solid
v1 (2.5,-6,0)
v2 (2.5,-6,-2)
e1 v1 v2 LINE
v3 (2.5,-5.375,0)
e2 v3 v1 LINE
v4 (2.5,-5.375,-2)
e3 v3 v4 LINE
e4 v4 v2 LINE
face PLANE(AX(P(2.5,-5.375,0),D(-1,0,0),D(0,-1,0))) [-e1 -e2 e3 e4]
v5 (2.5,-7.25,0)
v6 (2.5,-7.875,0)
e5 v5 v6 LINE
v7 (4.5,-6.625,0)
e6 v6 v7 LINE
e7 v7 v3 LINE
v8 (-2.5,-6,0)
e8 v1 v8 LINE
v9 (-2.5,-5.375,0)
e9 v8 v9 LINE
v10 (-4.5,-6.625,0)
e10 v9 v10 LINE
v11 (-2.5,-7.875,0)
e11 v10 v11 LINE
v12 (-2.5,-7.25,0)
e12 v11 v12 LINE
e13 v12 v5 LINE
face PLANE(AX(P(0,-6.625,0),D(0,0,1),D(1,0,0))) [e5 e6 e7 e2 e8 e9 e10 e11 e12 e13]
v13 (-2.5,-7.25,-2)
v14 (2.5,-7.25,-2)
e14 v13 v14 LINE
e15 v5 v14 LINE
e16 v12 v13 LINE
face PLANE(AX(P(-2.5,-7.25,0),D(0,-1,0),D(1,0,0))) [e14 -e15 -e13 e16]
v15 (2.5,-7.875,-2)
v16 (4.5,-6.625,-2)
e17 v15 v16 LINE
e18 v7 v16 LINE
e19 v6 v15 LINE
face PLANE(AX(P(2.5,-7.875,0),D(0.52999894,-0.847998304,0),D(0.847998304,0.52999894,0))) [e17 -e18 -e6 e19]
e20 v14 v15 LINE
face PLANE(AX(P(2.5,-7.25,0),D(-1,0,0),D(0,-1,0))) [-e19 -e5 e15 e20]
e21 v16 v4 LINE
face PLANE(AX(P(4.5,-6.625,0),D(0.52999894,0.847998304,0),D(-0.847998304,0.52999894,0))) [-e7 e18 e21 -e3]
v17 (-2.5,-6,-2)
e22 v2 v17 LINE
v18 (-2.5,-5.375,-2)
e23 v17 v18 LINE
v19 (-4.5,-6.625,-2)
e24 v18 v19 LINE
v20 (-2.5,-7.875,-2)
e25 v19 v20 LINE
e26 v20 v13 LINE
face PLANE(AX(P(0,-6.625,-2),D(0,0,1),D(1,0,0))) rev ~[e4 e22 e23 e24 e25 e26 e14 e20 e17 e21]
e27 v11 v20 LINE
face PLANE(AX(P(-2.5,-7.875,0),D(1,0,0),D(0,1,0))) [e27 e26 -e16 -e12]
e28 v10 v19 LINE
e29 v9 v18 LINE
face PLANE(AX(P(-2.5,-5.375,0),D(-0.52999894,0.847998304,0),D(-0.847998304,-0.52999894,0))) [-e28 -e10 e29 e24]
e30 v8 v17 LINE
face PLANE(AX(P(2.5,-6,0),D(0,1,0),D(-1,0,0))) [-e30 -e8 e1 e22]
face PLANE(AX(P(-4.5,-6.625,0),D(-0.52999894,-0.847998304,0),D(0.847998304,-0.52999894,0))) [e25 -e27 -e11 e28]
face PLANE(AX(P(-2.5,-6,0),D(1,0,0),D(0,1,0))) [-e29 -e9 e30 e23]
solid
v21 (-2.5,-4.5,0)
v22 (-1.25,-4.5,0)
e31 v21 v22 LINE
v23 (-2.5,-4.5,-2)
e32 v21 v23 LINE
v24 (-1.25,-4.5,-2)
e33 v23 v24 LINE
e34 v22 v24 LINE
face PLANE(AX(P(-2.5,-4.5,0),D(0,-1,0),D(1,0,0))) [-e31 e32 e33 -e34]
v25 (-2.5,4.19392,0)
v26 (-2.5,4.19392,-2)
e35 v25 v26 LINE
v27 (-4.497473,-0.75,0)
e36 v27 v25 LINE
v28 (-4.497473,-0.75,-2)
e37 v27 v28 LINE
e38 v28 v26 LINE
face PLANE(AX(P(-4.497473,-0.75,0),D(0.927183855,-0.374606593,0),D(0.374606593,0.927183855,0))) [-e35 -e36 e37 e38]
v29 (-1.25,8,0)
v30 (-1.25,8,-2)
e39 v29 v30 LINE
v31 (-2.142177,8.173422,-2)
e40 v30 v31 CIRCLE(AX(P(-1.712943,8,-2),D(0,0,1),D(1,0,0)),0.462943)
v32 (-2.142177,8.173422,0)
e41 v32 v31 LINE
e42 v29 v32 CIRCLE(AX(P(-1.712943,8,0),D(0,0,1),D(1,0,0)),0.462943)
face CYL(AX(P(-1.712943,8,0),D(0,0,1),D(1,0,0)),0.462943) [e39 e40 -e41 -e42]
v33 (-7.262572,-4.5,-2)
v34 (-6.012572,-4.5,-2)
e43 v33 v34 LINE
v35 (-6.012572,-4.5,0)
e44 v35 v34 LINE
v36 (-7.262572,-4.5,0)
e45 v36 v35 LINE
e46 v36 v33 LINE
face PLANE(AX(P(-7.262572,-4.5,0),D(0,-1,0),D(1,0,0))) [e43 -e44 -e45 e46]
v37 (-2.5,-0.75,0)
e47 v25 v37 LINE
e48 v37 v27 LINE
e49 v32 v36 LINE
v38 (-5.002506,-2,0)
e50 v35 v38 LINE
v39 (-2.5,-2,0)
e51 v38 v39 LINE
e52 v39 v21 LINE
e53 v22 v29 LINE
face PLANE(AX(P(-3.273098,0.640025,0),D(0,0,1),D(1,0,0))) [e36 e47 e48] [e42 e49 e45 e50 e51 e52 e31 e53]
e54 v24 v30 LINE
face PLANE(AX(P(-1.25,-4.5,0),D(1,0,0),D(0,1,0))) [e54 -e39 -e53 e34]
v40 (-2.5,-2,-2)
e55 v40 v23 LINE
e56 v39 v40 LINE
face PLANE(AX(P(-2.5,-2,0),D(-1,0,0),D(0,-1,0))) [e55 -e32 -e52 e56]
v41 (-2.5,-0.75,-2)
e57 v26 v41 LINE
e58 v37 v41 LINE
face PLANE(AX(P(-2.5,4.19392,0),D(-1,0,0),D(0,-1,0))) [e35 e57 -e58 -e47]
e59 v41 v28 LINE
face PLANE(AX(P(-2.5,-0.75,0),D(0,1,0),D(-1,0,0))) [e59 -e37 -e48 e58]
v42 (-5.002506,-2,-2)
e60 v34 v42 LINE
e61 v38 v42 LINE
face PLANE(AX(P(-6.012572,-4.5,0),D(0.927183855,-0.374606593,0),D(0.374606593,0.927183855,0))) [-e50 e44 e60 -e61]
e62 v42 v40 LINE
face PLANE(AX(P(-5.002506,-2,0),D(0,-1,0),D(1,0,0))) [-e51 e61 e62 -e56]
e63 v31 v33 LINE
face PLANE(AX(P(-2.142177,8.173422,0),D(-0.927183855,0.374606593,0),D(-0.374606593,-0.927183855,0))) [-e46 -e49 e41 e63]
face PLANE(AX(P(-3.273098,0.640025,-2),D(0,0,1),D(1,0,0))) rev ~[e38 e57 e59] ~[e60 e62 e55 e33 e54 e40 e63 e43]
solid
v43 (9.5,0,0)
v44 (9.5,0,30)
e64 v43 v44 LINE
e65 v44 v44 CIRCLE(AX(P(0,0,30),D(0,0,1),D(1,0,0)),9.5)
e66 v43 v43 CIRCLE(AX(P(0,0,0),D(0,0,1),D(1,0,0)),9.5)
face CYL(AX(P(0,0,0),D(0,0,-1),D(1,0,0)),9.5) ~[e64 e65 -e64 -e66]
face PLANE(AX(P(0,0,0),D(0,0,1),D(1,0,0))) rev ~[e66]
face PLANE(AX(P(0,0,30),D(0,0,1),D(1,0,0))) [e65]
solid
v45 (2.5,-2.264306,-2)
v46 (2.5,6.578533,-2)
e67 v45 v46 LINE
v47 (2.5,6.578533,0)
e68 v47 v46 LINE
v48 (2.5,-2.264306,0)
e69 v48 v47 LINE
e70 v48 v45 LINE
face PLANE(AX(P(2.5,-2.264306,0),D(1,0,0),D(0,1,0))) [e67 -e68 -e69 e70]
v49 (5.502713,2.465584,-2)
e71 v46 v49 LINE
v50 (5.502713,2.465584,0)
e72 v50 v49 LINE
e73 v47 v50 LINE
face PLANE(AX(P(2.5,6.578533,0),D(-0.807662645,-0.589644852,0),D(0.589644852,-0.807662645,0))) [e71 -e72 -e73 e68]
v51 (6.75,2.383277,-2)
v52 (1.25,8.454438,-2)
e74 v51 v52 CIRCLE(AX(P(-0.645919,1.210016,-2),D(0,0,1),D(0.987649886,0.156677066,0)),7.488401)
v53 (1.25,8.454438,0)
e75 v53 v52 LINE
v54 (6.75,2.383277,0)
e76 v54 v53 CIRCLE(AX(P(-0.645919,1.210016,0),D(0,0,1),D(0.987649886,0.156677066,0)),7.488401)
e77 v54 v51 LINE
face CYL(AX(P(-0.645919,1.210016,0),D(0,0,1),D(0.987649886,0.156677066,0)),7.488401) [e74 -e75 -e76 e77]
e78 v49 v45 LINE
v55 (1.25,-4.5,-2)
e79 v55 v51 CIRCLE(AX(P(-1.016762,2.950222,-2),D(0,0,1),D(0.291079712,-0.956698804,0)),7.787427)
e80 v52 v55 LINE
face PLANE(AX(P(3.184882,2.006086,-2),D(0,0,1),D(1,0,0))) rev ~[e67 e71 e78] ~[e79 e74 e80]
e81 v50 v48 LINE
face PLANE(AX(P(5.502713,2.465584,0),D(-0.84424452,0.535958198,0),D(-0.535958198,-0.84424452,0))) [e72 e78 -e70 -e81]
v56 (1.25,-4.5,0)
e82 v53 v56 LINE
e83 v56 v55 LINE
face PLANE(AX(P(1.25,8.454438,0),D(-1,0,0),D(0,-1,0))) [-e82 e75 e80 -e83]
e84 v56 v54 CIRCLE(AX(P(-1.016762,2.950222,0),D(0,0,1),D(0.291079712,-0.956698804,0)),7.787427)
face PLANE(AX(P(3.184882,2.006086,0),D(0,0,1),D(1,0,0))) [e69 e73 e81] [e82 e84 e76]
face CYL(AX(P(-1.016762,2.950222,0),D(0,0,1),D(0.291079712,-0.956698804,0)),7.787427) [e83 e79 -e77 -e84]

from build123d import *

# Parameters (mm, degrees)
F1_DEPTH = 2
F0_R     = 9.5
F2_DEPTH = 30


with BuildPart() as f1:
    # F0 (on Top) → F1 (new body)
    with BuildSketch(Plane.XY):
        with BuildLine():
            Line((-2.5, -4.5), (-1.25, -4.5))
            Line((-1.25, -4.5), (-1.25, 8))
            ThreePointArc((-1.25, 8), (-1.6246096615, 8.4544378581), (-2.1421771094, 8.1734216623))
            Line((-2.1421771094, 8.1734216623), (-7.2625718321, -4.5))
            Line((-7.2625718321, -4.5), (-6.0125718321, -4.5))
            Line((-6.0125718321, -4.5), (-5.0025062675, -2))
            Line((-5.0025062675, -2), (-2.5, -2))
            Line((-2.5, -2), (-2.5, -4.5))
        make_face()
        Polygon((-2.5, -0.75), (-4.4974734852, -0.75), (-2.5, 4.1939203632), align=None, mode=Mode.SUBTRACT)
    extrude(amount=-F1_DEPTH)


with BuildPart() as f1b:
    # F0 (on Top) → F1, piece 2 (new body)
    with BuildSketch(Plane.XY):
        with BuildLine():
            Line((1.25, 8.4544378581), (1.25, -4.5))
            ThreePointArc((1.25, -4.5), (5.067050605, -1.9109756291), (6.75, 2.3832767911))
            ThreePointArc((6.75, 2.3832767911), (4.9037938648, 6.237624312), (1.25, 8.4544378581))
        make_face()
        Polygon((2.5, -2.2643063941), (2.5, 6.5785330377), (5.502712767, 2.4655844973), align=None, mode=Mode.SUBTRACT)
    extrude(amount=-F1_DEPTH)


with BuildPart() as f1c:
    # F0 (on Top) → F1, piece 3 (new body)
    with BuildSketch(Plane.XY):
        Polygon((2.5, -6), (-2.5, -6), (-2.5, -5.375), (-4.5, -6.625), (-2.5, -7.875), (-2.5, -7.25), (2.5, -7.25), (2.5, -7.875), (4.5, -6.625), (2.5, -5.375), align=None)
    extrude(amount=-F1_DEPTH)


with BuildPart() as f2:
    # F0 (on Top) → F2 (new body)
    with BuildSketch(Plane.XY):
        Circle(F0_R)
        Polygon((-2.5, -5.375), (-2.5, -6), (2.5, -6), (2.5, -5.375), (4.5, -6.625), (2.5, -7.875), (2.5, -7.25), (-2.5, -7.25), (-2.5, -7.875), (-4.5, -6.625), align=None, mode=Mode.SUBTRACT)
        with BuildLine():
            Line((-1.25, 8), (-1.25, -4.5))
            Line((-1.25, -4.5), (-2.5, -4.5))
            Line((-2.5, -4.5), (-2.5, -2))
            Line((-2.5, -2), (-5.0025062675, -2))
            Line((-5.0025062675, -2), (-6.0125718321, -4.5))
            Line((-6.0125718321, -4.5), (-7.2625718321, -4.5))
            Line((-7.2625718321, -4.5), (-2.1421771094, 8.1734216623))
            ThreePointArc((-2.1421771094, 8.1734216623), (-1.6246096615, 8.4544378581), (-1.25, 8))
        make_face(mode=Mode.SUBTRACT)
        with BuildLine():
            ThreePointArc((6.75, 2.3832767911), (5.067050605, -1.9109756291), (1.25, -4.5))
            Line((1.25, -4.5), (1.25, 8.4544378581))
            ThreePointArc((1.25, 8.4544378581), (4.9037938648, 6.237624312), (6.75, 2.3832767911))
        make_face(mode=Mode.SUBTRACT)
        with BuildLine():
            Line((1.25, 8.4544378581), (1.25, -4.5))
            ThreePointArc((1.25, -4.5), (5.067050605, -1.9109756291), (6.75, 2.3832767911))
            ThreePointArc((6.75, 2.3832767911), (4.9037938648, 6.237624312), (1.25, 8.4544378581))
        make_face()
        Polygon((2.5, -2.2643063941), (2.5, 6.5785330377), (5.502712767, 2.4655844973), align=None, mode=Mode.SUBTRACT)
        with BuildLine():
            Line((-2.5, -4.5), (-1.25, -4.5))
            Line((-1.25, -4.5), (-1.25, 8))
            ThreePointArc((-1.25, 8), (-1.6246096615, 8.4544378581), (-2.1421771094, 8.1734216623))
            Line((-2.1421771094, 8.1734216623), (-7.2625718321, -4.5))
            Line((-7.2625718321, -4.5), (-6.0125718321, -4.5))
            Line((-6.0125718321, -4.5), (-5.0025062675, -2))
            Line((-5.0025062675, -2), (-2.5, -2))
            Line((-2.5, -2), (-2.5, -4.5))
        make_face()
        Polygon((-2.5, -0.75), (-4.4974734852, -0.75), (-2.5, 4.1939203632), align=None, mode=Mode.SUBTRACT)
        Polygon((5.502712767, 2.4655844973), (2.5, 6.5785330377), (2.5, -2.2643063941), align=None)
        Polygon((2.5, -6), (-2.5, -6), (-2.5, -5.375), (-4.5, -6.625), (-2.5, -7.875), (-2.5, -7.25), (2.5, -7.25), (2.5, -7.875), (4.5, -6.625), (2.5, -5.375), align=None)
        Polygon((-2.5, 4.1939203632), (-4.4974734852, -0.75), (-2.5, -0.75), align=None)
    extrude(amount=F2_DEPTH)


solid = Compound([f1.part, f1b.part, f1c.part, f2.part])
